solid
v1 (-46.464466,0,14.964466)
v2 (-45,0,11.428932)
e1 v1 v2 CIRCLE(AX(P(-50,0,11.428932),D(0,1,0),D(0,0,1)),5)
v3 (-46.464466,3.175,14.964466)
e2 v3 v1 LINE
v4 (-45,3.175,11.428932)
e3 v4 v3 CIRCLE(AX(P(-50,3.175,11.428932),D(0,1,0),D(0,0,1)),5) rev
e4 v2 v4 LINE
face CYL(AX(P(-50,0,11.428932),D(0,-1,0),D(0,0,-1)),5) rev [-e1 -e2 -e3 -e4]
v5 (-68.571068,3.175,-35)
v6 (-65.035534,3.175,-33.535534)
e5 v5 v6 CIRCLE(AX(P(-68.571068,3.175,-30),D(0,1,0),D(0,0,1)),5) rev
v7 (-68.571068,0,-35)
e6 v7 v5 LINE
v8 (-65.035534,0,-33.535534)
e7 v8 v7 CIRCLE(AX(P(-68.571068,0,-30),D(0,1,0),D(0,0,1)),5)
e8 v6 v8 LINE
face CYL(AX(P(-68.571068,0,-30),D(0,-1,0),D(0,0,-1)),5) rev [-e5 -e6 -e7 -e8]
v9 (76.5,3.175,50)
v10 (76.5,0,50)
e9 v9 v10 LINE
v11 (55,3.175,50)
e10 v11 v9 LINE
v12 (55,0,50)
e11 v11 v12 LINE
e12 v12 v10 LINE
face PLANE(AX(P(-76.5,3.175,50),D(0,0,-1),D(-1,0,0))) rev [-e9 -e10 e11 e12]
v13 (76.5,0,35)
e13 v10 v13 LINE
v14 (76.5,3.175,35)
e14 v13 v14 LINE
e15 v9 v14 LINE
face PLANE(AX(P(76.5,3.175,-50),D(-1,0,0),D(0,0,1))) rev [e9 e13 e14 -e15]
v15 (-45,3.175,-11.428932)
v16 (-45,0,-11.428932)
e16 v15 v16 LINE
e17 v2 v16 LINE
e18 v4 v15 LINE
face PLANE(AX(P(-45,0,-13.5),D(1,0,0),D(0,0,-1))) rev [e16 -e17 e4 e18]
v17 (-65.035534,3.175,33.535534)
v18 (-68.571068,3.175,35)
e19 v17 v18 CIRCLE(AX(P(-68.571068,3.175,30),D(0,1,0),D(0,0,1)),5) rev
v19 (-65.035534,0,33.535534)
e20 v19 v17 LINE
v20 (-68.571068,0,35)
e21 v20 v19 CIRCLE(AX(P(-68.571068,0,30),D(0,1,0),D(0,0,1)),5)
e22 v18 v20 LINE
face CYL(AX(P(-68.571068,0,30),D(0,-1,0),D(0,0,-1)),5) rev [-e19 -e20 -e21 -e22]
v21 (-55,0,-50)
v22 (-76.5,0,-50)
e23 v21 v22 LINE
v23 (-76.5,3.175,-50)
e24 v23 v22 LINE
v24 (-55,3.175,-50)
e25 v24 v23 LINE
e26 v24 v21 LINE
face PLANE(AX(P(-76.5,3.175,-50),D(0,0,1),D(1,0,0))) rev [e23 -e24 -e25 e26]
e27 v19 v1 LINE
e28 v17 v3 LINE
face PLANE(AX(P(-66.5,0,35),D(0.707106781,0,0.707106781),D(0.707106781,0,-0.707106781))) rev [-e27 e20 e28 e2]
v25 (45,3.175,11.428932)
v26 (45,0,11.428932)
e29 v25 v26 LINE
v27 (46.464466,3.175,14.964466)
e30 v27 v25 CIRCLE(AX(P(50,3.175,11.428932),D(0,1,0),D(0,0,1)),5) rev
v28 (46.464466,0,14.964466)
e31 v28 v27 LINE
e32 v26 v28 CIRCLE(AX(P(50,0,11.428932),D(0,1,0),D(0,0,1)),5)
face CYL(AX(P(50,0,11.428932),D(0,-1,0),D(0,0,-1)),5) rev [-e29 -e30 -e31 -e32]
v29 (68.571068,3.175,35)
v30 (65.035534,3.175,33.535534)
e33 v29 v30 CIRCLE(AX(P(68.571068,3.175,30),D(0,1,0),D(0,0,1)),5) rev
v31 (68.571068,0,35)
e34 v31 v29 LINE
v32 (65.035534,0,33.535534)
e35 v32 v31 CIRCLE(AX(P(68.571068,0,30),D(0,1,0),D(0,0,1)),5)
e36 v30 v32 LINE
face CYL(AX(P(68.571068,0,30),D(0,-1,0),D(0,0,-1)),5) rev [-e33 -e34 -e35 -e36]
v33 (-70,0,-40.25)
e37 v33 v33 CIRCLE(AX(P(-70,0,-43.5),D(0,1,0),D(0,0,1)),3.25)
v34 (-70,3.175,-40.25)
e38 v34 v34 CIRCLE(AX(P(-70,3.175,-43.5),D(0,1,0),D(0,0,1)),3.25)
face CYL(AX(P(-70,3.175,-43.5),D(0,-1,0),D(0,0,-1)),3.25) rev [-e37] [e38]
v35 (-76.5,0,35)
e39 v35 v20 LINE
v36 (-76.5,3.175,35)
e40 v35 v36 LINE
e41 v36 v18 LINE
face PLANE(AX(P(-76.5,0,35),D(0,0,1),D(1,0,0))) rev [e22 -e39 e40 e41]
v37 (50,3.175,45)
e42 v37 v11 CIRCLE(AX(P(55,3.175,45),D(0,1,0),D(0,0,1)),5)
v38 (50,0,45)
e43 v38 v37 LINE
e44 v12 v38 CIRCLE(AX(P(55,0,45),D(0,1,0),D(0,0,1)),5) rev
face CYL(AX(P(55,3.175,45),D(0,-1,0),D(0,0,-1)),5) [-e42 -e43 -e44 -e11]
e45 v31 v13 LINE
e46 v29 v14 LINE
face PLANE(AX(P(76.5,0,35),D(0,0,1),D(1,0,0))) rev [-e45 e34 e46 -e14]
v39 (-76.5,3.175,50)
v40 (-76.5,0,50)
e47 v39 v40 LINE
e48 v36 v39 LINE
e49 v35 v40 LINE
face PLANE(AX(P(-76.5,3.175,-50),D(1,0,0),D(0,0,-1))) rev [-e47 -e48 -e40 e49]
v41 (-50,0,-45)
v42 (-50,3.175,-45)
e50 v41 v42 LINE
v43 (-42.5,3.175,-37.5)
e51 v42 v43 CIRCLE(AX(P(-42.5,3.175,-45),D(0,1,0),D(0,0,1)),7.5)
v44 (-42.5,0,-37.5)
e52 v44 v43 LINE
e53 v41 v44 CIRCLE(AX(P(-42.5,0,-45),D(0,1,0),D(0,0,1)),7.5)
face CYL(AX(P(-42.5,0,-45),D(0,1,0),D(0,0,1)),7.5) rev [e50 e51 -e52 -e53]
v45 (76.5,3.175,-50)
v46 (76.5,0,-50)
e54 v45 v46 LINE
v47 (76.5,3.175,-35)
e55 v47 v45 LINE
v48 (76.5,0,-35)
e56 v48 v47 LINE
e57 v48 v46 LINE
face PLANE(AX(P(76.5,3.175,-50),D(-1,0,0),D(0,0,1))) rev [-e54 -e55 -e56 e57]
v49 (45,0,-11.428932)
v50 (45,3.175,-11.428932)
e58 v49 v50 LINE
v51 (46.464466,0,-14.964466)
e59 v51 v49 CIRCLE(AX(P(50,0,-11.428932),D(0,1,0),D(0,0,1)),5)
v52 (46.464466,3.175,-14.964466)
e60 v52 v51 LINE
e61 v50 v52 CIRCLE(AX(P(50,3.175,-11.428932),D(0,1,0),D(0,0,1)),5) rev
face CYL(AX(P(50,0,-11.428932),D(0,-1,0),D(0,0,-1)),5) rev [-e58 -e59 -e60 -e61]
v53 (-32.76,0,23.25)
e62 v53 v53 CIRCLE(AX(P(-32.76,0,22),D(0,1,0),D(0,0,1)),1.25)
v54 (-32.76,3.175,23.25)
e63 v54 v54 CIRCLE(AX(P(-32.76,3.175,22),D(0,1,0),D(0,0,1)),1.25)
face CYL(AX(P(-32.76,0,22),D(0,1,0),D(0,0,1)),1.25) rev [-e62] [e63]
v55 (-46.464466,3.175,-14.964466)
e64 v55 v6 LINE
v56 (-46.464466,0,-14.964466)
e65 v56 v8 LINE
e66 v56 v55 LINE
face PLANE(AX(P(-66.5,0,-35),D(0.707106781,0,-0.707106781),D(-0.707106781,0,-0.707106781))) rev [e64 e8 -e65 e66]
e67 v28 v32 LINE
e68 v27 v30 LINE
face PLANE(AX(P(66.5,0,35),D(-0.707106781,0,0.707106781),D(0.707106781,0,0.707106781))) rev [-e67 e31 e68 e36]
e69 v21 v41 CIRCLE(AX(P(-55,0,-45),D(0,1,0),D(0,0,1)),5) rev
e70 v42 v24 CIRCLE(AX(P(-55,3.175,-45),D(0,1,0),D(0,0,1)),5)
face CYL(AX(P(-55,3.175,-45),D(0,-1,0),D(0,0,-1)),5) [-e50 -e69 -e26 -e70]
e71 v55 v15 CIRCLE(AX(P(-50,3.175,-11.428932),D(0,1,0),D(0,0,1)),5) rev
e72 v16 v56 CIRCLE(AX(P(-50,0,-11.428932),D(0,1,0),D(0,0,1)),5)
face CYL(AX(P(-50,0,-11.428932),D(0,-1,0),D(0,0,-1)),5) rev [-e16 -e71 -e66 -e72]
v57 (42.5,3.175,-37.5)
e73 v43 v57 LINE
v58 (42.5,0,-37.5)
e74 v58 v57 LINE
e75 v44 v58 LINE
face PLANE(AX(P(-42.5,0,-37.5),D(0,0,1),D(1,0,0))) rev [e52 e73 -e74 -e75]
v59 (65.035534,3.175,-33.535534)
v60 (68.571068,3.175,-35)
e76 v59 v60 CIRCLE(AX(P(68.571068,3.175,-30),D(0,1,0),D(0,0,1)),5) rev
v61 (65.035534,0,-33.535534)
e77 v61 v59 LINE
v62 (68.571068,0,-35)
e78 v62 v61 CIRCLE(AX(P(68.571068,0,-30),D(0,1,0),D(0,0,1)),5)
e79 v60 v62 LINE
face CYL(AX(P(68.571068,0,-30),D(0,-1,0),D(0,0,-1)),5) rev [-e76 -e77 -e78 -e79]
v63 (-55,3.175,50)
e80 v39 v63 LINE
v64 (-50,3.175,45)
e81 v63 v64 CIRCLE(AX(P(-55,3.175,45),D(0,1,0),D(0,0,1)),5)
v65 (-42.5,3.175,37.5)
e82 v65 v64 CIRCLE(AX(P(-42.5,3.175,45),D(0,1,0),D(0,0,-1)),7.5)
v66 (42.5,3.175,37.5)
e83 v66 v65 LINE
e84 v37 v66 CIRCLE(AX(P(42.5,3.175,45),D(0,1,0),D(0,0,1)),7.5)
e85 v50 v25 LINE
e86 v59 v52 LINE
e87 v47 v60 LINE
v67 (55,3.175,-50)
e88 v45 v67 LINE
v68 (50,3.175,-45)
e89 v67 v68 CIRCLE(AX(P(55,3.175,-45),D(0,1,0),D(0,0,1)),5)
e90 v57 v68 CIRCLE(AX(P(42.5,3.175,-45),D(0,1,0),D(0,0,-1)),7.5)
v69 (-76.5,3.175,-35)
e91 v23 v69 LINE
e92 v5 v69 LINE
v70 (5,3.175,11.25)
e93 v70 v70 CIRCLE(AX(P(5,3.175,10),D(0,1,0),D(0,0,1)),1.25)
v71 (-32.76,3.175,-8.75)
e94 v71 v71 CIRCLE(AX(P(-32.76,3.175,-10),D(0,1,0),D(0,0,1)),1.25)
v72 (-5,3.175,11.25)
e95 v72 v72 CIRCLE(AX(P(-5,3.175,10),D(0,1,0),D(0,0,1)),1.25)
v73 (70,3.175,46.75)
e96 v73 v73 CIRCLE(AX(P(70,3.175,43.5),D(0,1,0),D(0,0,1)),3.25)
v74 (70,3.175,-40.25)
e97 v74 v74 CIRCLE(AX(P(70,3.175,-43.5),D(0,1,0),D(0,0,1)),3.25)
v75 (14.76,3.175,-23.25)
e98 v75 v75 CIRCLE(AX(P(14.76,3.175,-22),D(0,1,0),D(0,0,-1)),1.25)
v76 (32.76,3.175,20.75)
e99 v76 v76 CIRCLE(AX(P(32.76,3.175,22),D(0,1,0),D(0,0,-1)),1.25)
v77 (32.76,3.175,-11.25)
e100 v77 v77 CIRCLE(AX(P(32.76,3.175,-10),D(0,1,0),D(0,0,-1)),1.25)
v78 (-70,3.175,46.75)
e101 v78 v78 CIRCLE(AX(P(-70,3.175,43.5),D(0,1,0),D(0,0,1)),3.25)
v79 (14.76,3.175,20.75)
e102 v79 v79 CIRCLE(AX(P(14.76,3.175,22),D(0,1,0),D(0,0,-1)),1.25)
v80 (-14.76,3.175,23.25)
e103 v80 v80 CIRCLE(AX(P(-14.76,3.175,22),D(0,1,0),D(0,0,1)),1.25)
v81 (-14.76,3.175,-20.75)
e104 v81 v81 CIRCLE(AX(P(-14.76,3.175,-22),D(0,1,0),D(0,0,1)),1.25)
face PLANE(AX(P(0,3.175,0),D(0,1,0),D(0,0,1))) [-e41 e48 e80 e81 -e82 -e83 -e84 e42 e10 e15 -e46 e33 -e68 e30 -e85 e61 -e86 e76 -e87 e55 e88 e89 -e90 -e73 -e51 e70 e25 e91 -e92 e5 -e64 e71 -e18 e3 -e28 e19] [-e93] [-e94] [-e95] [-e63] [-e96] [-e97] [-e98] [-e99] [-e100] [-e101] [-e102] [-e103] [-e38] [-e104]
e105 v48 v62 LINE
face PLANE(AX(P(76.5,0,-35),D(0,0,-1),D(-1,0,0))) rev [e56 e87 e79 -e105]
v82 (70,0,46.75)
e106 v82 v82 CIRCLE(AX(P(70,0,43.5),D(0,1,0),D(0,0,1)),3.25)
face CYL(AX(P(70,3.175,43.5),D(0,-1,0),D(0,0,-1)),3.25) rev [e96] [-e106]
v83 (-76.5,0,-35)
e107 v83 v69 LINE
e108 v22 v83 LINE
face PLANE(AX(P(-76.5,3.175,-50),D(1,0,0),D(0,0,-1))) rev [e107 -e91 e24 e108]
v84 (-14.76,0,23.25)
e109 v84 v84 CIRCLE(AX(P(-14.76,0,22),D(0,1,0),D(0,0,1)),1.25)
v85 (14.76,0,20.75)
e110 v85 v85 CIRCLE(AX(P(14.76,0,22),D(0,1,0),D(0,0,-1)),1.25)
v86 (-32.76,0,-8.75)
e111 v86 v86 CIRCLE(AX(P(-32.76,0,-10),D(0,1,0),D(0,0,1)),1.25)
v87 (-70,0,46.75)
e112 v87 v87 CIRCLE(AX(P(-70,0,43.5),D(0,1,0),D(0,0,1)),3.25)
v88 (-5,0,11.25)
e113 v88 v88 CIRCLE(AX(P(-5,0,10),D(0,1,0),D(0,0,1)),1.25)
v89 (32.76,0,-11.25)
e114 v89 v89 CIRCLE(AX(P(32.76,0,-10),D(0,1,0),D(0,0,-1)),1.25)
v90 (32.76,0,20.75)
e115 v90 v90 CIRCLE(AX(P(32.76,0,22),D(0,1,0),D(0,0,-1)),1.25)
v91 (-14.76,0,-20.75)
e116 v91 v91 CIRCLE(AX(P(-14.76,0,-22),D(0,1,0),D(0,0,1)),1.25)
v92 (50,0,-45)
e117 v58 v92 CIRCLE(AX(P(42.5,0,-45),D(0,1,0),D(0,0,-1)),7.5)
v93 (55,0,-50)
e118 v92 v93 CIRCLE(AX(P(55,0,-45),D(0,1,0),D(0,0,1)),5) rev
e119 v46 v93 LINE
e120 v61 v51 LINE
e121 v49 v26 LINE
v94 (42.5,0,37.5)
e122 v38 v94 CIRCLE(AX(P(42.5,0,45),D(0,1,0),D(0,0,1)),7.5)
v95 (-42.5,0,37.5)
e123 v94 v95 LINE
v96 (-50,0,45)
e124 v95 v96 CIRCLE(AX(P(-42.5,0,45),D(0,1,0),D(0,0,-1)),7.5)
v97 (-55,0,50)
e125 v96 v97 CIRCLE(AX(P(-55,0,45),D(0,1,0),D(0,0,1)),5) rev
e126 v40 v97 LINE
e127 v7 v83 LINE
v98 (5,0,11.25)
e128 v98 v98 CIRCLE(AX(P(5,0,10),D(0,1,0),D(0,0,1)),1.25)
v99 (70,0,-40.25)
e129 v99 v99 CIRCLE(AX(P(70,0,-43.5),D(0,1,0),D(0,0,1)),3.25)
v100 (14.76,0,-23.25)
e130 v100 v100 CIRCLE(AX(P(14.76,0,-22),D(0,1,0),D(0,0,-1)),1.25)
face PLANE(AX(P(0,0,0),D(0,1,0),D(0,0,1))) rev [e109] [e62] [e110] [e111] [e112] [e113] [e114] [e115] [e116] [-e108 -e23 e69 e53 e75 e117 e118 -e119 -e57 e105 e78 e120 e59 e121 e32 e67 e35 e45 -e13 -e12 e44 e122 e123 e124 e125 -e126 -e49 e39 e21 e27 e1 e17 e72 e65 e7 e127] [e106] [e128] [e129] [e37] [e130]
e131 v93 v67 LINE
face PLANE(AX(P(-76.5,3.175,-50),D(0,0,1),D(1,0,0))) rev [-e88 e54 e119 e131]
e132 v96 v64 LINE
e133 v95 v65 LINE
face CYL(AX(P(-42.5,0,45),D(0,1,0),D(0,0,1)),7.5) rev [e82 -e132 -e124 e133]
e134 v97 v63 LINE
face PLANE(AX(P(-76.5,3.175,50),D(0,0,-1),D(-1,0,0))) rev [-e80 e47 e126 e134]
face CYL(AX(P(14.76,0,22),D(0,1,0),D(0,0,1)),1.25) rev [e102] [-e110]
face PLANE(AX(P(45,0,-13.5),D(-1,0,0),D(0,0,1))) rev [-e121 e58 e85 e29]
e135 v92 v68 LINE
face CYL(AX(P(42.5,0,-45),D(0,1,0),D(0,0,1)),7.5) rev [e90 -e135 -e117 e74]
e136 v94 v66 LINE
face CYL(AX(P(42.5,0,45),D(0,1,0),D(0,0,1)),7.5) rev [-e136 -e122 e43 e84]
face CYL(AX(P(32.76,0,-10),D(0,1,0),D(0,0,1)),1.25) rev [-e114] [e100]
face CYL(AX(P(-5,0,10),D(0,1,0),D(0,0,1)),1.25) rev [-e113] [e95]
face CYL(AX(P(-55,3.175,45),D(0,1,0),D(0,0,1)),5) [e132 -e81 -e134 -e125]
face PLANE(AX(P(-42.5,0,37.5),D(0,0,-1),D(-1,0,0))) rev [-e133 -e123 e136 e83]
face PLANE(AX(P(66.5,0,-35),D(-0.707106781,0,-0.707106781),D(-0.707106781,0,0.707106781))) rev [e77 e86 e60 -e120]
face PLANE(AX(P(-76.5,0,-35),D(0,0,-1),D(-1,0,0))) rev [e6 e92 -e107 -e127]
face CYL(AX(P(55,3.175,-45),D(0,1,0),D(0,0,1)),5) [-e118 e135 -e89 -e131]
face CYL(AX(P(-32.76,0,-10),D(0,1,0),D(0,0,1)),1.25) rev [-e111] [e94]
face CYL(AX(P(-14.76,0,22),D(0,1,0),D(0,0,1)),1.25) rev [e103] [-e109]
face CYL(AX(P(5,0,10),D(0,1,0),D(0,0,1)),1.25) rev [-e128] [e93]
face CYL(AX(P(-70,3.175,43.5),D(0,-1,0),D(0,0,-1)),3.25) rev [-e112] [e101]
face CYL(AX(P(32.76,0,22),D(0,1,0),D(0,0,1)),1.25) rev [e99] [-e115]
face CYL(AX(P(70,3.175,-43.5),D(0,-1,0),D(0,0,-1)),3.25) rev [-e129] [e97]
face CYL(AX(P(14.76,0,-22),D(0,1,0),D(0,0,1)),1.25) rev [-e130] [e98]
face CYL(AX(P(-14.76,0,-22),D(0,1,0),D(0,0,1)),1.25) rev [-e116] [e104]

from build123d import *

# Parameters (mm, degrees)
SKETCH1_W           = 153
SKETCH1_H           = 100
SKETCH1_R           = 3.25
BOSS_EXTRUDE1_DEPTH = 3.175
CUT_EXTRUDE1_DEPTH  = 92.4457797
CUT_EXTRUDE2_DEPTH  = 92.4457797
FILLET1_R           = 5
SKETCH4_R           = 1.25
CUT_EXTRUDE3_DEPTH  = 92.4457797
SKETCH5_R           = 1.25
CUT_EXTRUDE4_DEPTH  = 92.4457797
SKETCH6_W           = 85
SKETCH6_H           = 12.5
CUT_EXTRUDE5_DEPTH  = 92.4457797


with BuildPart() as part:
    # Sketch1 → Boss-Extrude1 (new body)
    with BuildSketch(Plane(origin=(0, 0, 0), x_dir=(1, 0, 0), z_dir=(0, 1, 0))):
        Rectangle(SKETCH1_W, SKETCH1_H)
        with Locations(Location((-70, 43.5, 0), (0, 0, 270))):
            Circle(SKETCH1_R, mode=Mode.SUBTRACT)
        with Locations(Location((70, 43.5, 0), (0, 0, 270))):
            Circle(SKETCH1_R, mode=Mode.SUBTRACT)
        with Locations(Location((70, -43.5, 0), (0, 0, 270))):
            Circle(SKETCH1_R, mode=Mode.SUBTRACT)
        with Locations(Location((-70, -43.5, 0), (0, 0, 270))):
            Circle(SKETCH1_R, mode=Mode.SUBTRACT)
    extrude(amount=BOSS_EXTRUDE1_DEPTH)

    # Sketch2 → Cut-Extrude1 (cut, through all)
    with BuildSketch(Plane(origin=(0, 3.175, 0), x_dir=(1, 0, 0), z_dir=(0, 1, 0))):
        Polygon((-76.5, 35), (-66.5, 35), (-45, 13.5), (-45, -13.5), (-66.5, -35), (-76.5, -35), align=None)
        Polygon((76.5, -35), (66.5, -35), (45, -13.5), (45, 13.5), (66.5, 35), (76.5, 35), align=None)
    extrude(amount=-CUT_EXTRUDE1_DEPTH, mode=Mode.SUBTRACT)

    # Sketch3 → Cut-Extrude2 (cut, through all)
    with BuildSketch(Plane(origin=(0, 3.175, 0), x_dir=(1, 0, 0), z_dir=(0, 1, 0))):
        with BuildLine():
            Line((-50, 45), (-50, 60))
            ThreePointArc((-50, 60), (-42.5, 67.5), (-35, 60))
            Line((-35, 60), (-35, 45))
            ThreePointArc((-35, 45), (-42.5, 37.5), (-50, 45))
        make_face()
        with BuildLine():
            Line((50, 45), (50, 60))
            ThreePointArc((50, 60), (42.5, 67.5), (35, 60))
            Line((35, 60), (35, 45))
            ThreePointArc((35, 45), (42.5, 37.5), (50, 45))
        make_face()
        with BuildLine():
            Line((-50, -45), (-50, -60))
            ThreePointArc((-50, -60), (-42.5, -67.5), (-35, -60))
            Line((-35, -60), (-35, -45))
            ThreePointArc((-35, -45), (-42.5, -37.5), (-50, -45))
        make_face()
        with BuildLine():
            Line((50, -45), (50, -60))
            ThreePointArc((50, -60), (42.5, -67.5), (35, -60))
            Line((35, -60), (35, -45))
            ThreePointArc((35, -45), (42.5, -37.5), (50, -45))
        make_face()
    extrude(amount=-CUT_EXTRUDE2_DEPTH, mode=Mode.SUBTRACT)

    # Fillet1
    fillet1_edges = [part.edges().sort_by_distance(p)[0] for p in [
        (-45, 1.5875, -13.5),
        (-45, 1.5875, 13.5),
        (-66.5, 1.5875, 35),
        (-50, 1.5875, 50),
        (-35, 1.5875, 50),
        (35, 1.5875, 50),
        (50, 1.5875, 50),
        (66.5, 1.5875, 35),
        (45, 1.5875, 13.5),
        (45, 1.5875, -13.5),
        (66.5, 1.5875, -35),
        (50, 1.5875, -50),
        (35, 1.5875, -50),
        (-35, 1.5875, -50),
        (-50, 1.5875, -50),
        (-66.5, 1.5875, -35),
    ]]
    fillet(fillet1_edges, radius=FILLET1_R - 0.0001)  # a hair under: the kernel refuses the full size

    # Sketch4 → Cut-Extrude3 (cut, through all)
    with BuildSketch(Plane(origin=(0, 3.175, 0), x_dir=(1, 0, 0), z_dir=(0, 1, 0))):
        with Locations(Location((-32.76, 10, 0), (0, 0, 270))):
            Circle(SKETCH4_R)
        with Locations(Location((-14.76, 22, 0), (0, 0, 270))):
            Circle(SKETCH4_R)
        with Locations(Location((-14.76, -22, 0), (0, 0, 270))):
            Circle(SKETCH4_R)
        with Locations(Location((-32.76, -22, 0), (0, 0, 270))):
            Circle(SKETCH4_R)
        with Locations(Location((32.76, -22, 0), (0, 0, 90))):
            Circle(SKETCH4_R)
        with Locations(Location((14.76, -22, 0), (0, 0, 90))):
            Circle(SKETCH4_R)
        with Locations(Location((14.76, 22, 0), (0, 0, 90))):
            Circle(SKETCH4_R)
        with Locations(Location((32.76, 10, 0), (0, 0, 90))):
            Circle(SKETCH4_R)
    extrude(amount=-CUT_EXTRUDE3_DEPTH, mode=Mode.SUBTRACT)

    # Sketch5 → Cut-Extrude4 (cut, through all)
    with BuildSketch(Plane(origin=(0, 3.175, 0), x_dir=(1, 0, 0), z_dir=(0, 1, 0))):
        with Locations(Location((-5, -10, 0), (0, 0, 270))):
            Circle(SKETCH5_R)
        with Locations(Location((5, -10, 0), (0, 0, 270))):
            Circle(SKETCH5_R)
    extrude(amount=-CUT_EXTRUDE4_DEPTH, mode=Mode.SUBTRACT)

    # Sketch6 → Cut-Extrude5 (cut, through all)
    with BuildSketch(Plane(origin=(0, 3.175, 0), x_dir=(1, 0, 0), z_dir=(0, 1, 0))):
        with Locations((0, 43.75)):
            Rectangle(SKETCH6_W, SKETCH6_H)
        with Locations((0, -43.75)):
            Rectangle(SKETCH6_W, SKETCH6_H)
    extrude(amount=-CUT_EXTRUDE5_DEPTH, mode=Mode.SUBTRACT)


solid = part.part
